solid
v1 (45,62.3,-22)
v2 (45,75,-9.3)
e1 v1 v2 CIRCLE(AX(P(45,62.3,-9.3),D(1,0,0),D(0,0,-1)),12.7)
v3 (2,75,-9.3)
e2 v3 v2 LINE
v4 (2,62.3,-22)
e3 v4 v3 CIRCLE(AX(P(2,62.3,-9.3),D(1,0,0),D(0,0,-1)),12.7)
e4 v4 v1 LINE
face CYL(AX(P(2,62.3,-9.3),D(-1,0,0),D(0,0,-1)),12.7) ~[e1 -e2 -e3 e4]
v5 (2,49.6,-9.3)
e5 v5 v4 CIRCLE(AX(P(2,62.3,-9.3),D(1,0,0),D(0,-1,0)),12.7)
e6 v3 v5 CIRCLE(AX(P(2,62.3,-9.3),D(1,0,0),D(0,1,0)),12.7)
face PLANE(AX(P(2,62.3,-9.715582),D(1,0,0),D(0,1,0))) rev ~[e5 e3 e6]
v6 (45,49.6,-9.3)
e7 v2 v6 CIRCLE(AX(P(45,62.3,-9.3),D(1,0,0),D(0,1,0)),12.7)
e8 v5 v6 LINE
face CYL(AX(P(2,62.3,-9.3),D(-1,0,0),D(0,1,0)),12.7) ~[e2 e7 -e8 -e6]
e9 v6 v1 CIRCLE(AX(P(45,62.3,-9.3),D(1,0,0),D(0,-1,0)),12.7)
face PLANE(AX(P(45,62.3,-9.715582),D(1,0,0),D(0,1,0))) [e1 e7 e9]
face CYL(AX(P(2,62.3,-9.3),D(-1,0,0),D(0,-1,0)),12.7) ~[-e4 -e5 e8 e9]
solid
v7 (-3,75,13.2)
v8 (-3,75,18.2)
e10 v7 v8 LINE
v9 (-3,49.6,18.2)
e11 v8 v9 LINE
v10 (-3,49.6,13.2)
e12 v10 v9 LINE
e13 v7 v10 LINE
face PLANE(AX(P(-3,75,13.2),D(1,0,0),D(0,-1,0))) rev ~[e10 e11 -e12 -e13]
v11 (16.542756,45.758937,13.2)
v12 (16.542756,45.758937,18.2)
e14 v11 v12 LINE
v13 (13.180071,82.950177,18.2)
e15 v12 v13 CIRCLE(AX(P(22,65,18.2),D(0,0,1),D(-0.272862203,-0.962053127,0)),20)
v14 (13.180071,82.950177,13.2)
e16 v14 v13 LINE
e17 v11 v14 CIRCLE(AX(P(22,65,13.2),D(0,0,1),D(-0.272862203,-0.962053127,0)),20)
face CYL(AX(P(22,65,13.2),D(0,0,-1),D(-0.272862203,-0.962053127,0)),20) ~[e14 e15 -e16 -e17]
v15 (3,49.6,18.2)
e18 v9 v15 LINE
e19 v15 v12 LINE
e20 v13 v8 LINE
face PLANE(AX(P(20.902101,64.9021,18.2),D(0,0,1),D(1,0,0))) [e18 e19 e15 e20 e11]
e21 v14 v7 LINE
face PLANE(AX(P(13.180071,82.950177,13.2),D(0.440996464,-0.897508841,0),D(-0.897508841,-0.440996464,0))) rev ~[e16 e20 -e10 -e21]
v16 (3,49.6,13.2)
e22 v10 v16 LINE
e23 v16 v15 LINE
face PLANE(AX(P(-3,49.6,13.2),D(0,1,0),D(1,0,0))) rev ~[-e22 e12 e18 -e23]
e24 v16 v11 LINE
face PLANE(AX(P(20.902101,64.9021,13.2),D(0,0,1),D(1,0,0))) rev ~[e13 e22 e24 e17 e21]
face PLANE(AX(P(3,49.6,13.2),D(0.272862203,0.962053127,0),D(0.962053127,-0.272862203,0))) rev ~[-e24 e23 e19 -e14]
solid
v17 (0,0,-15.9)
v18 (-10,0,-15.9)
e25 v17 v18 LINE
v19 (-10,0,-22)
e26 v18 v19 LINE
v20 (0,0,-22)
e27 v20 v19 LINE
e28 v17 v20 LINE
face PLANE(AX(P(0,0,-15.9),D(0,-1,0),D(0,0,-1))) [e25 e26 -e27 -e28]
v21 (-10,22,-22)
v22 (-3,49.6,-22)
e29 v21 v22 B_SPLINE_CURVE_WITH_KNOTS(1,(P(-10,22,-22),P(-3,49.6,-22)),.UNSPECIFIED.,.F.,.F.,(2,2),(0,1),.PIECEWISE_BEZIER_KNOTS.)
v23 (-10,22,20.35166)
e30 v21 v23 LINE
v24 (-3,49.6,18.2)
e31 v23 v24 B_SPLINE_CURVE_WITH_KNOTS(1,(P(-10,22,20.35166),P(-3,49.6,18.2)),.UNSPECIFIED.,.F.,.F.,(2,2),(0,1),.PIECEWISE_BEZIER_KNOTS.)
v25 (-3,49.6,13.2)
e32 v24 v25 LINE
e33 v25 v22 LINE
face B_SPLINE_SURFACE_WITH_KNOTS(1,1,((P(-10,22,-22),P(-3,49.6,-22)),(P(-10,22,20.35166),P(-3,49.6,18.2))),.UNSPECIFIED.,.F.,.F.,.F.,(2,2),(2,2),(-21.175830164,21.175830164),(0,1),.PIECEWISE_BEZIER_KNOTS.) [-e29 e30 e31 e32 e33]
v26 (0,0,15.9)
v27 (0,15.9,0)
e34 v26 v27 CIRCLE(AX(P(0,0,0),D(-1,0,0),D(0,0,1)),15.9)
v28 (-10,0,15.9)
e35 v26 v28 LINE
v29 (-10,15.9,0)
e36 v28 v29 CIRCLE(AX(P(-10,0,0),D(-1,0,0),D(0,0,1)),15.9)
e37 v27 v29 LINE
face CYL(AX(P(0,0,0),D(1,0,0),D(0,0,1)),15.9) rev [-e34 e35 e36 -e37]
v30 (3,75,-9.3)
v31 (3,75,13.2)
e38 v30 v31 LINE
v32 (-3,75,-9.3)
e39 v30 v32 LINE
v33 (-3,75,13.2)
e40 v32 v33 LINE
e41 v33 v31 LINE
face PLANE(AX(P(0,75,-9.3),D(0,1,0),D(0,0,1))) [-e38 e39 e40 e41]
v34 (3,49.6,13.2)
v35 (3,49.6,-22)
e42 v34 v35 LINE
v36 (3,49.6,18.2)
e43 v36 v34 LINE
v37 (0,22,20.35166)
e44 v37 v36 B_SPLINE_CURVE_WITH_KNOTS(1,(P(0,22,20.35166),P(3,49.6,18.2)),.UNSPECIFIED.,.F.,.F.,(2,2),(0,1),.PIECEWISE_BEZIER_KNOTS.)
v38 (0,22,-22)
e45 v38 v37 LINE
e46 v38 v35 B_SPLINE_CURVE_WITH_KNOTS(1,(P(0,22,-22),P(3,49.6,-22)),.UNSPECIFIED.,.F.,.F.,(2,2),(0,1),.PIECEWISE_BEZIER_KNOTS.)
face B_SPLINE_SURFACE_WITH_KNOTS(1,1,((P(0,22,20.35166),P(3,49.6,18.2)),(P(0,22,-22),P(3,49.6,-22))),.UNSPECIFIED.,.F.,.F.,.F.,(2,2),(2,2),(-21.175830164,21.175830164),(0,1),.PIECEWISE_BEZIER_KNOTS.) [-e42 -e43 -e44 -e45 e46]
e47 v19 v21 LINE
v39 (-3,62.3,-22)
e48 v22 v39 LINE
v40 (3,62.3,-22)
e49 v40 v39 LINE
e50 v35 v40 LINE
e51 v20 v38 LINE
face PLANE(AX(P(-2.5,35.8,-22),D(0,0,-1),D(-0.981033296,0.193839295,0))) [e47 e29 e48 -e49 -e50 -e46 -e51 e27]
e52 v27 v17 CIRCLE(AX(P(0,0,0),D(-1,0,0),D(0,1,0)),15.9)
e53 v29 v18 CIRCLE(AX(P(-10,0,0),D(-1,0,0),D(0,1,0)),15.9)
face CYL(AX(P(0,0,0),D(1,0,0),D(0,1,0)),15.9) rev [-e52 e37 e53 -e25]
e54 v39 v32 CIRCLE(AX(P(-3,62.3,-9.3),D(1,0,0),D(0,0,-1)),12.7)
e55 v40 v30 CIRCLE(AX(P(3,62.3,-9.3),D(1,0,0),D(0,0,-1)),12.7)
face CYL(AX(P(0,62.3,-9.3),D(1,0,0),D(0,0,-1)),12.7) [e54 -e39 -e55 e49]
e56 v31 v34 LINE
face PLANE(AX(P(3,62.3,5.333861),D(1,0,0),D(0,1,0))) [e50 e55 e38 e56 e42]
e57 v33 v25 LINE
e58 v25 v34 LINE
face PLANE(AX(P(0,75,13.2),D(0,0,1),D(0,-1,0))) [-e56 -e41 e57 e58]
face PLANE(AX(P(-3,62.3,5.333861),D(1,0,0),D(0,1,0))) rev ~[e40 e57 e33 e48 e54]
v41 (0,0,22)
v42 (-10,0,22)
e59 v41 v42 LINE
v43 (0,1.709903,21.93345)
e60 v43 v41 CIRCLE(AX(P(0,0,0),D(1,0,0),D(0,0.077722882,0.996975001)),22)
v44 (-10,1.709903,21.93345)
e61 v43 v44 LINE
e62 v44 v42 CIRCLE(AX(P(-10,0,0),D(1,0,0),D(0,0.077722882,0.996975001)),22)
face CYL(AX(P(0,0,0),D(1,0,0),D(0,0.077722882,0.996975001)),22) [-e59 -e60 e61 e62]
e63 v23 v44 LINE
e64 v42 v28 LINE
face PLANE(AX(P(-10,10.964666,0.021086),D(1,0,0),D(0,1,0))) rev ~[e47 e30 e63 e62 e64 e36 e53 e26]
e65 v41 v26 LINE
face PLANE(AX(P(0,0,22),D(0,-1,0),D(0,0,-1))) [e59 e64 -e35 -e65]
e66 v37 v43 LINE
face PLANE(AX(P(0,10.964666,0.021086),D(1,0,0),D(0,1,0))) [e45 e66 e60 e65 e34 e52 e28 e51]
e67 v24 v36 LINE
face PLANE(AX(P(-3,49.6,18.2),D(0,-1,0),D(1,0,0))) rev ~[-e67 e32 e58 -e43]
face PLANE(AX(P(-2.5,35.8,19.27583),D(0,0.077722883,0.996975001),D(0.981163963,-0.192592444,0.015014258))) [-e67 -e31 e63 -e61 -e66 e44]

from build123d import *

# Parameters (mm, degrees)
F1_DEPTH      = 10
F2_DEPTH      = 3
F2_DEPTH_BACK = 3
F1_FACE_W     = 10
F1_FACE_H     = 42.3516603272
F2_FACE_W     = 6
F2_FACE_H     = 40.2
F5_DEPTH      = 5
F6_START      = 2
F6_DEPTH      = 43
F8_DEPTH      = 5


# Not quite as in the source:
# - a feature names something its author has since deleted; it is built from what else it names


with BuildPart() as f1:
    # F0 (on Right) → F1 (new body)
    with BuildSketch(Plane.YZ):
        with BuildLine():
            ThreePointArc((15.9, 0), (11.2429978209, -11.2429978209), (0, -15.9))
            Line((0, -15.9), (0, -22))
            ThreePointArc((0, -22), (15.5563491861, -15.5563491861), (22, 0))
            ThreePointArc((22, 0), (16.1495801051, 14.9395803966), (1.7099034157, 21.9334500321))
            ThreePointArc((1.7099034157, 21.9334500321), (0.8555989991, 21.9833562122), (0, 22))
            Line((0, 22), (0, 15.9))
            ThreePointArc((0, 15.9), (11.2429978209, 11.2429978209), (15.9, 0))
        make_face()
        with BuildLine():
            ThreePointArc((1.7099034157, 21.9334500321), (16.1495801051, 14.9395803966), (22, 0))
            Line((22, 0), (22, 20.3516603272))
            Line((22, 20.3516603272), (1.7099034157, 21.9334500321))
        make_face()
        with BuildLine():
            ThreePointArc((22, 0), (15.5563491861, -15.5563491861), (0, -22))
            Line((0, -22), (22, -22))
            Line((22, -22), (22, 0))
        make_face()
    extrude(amount=-F1_DEPTH)


with BuildPart() as f2:
    # F0 (on Right) → F2 (new body, two sides)
    with BuildSketch(Plane.YZ) as f2_sk:
        with BuildLine():
            Line((75, 18.2), (49.6, 18.2))
            Line((49.6, 18.2), (49.6, 13.2))
            Line((49.6, 13.2), (49.6, -9.3))
            ThreePointArc((49.6, -9.3), (62.3, 3.4), (75, -9.3))
            Line((75, -9.3), (75, 0))
            Line((75, 0), (75, 18.2))
        make_face()
        with BuildLine():
            ThreePointArc((49.6, -9.3), (53.3197438789, -18.2802561211), (62.3, -22))
            ThreePointArc((62.3, -22), (71.2802561211, -18.2802561211), (75, -9.3))
            ThreePointArc((75, -9.3), (62.3, 3.4), (49.6, -9.3))
        make_face()
        with BuildLine():
            Line((49.6, -9.3), (49.6, -22))
            Line((49.6, -22), (62.3, -22))
            ThreePointArc((62.3, -22), (53.3197438789, -18.2802561211), (49.6, -9.3))
        make_face()
    extrude(amount=F2_DEPTH)
    extrude(f2_sk.sketch, amount=-F2_DEPTH_BACK)


with BuildPart() as f3:
    # F1_face (on face) → F3 section 0
    with BuildSketch(Plane(origin=(-5, 22, -0.8241698364), x_dir=(-1, 0, 0), z_dir=(0, 1, 0))):
        Rectangle(F1_FACE_W, F1_FACE_H)
    # F2_face (on face) → F3 section 1
    with BuildSketch(Plane(origin=(0, 49.6, -1.9), x_dir=(1, 0, 0), z_dir=(0, -1, 0))):
        Rectangle(F2_FACE_W, F2_FACE_H)
    loft()


with BuildPart() as f1_1:
    add(f1.part)

    # F4: union F2, F3
    add(f2.part)
    add(f3.part)

    # F5 (cut): a face of the model
    f5_faces = [f1_1.faces().sort_by_distance(p)[0] for p in [
        (0, 62.3, 18.2),
    ]]
    extrude(f5_faces, amount=-F5_DEPTH, mode=Mode.SUBTRACT)


with BuildPart() as f6:
    # F0 (on Right) → F6 (new body)
    with BuildSketch(Plane.YZ.offset(F6_START)):
        with BuildLine():
            ThreePointArc((49.6, -9.3), (53.3197438789, -18.2802561211), (62.3, -22))
            ThreePointArc((62.3, -22), (71.2802561211, -18.2802561211), (75, -9.3))
            ThreePointArc((75, -9.3), (62.3, 3.4), (49.6, -9.3))
        make_face()
    extrude(amount=F6_DEPTH)


with BuildPart() as f8:
    # F7 (on face) → F8 (new body)
    with BuildSketch(Plane.XY.offset(13.2)):
        with BuildLine():
            ThreePointArc((16.5427559466, 45.7589374685), (34.0593349512, 49.0446735999), (42, 65))
            ThreePointArc((42, 65), (32.5735853544, 81.9764334521), (13.1800707248, 82.9501768119))
            ThreePointArc((13.1800707248, 82.9501768119), (6.9089457299, 78.1247887989), (3, 71.2449979984))
            Line((3, 71.2449979984), (3, 58.7550020016))
            ThreePointArc((3, 58.7550020016), (8.1521257946, 50.5696022234), (16.5427559466, 45.7589374685))
        make_face()
        with BuildLine():
            Line((3, 49.6), (16.5427559466, 45.7589374685))
            ThreePointArc((16.5427559466, 45.7589374685), (8.1521257946, 50.5696022234), (3, 58.7550020016))
            Line((3, 58.7550020016), (3, 49.6))
        make_face()
        with BuildLine():
            ThreePointArc((3, 58.7550020016), (2, 65), (3, 71.2449979984))
            Line((3, 71.2449979984), (3, 75))
            Line((3, 75), (-3, 75))
            Line((-3, 75), (-3, 49.6))
            Line((-3, 49.6), (3, 49.6))
            Line((3, 49.6), (3, 58.7550020016))
        make_face()
        with BuildLine():
            ThreePointArc((3, 71.2449979984), (6.9089457299, 78.1247887989), (13.1800707248, 82.9501768119))
            Line((13.1800707248, 82.9501768119), (-3, 75))
            Line((-3, 75), (3, 75))
            Line((3, 75), (3, 71.2449979984))
        make_face()
        with BuildLine():
            Line((3, 58.7550020016), (3, 71.2449979984))
            ThreePointArc((3, 71.2449979984), (2, 65), (3, 58.7550020016))
        make_face()
    extrude(amount=F8_DEPTH)


solid = Compound([f1_1.part, f6.part, f8.part])
